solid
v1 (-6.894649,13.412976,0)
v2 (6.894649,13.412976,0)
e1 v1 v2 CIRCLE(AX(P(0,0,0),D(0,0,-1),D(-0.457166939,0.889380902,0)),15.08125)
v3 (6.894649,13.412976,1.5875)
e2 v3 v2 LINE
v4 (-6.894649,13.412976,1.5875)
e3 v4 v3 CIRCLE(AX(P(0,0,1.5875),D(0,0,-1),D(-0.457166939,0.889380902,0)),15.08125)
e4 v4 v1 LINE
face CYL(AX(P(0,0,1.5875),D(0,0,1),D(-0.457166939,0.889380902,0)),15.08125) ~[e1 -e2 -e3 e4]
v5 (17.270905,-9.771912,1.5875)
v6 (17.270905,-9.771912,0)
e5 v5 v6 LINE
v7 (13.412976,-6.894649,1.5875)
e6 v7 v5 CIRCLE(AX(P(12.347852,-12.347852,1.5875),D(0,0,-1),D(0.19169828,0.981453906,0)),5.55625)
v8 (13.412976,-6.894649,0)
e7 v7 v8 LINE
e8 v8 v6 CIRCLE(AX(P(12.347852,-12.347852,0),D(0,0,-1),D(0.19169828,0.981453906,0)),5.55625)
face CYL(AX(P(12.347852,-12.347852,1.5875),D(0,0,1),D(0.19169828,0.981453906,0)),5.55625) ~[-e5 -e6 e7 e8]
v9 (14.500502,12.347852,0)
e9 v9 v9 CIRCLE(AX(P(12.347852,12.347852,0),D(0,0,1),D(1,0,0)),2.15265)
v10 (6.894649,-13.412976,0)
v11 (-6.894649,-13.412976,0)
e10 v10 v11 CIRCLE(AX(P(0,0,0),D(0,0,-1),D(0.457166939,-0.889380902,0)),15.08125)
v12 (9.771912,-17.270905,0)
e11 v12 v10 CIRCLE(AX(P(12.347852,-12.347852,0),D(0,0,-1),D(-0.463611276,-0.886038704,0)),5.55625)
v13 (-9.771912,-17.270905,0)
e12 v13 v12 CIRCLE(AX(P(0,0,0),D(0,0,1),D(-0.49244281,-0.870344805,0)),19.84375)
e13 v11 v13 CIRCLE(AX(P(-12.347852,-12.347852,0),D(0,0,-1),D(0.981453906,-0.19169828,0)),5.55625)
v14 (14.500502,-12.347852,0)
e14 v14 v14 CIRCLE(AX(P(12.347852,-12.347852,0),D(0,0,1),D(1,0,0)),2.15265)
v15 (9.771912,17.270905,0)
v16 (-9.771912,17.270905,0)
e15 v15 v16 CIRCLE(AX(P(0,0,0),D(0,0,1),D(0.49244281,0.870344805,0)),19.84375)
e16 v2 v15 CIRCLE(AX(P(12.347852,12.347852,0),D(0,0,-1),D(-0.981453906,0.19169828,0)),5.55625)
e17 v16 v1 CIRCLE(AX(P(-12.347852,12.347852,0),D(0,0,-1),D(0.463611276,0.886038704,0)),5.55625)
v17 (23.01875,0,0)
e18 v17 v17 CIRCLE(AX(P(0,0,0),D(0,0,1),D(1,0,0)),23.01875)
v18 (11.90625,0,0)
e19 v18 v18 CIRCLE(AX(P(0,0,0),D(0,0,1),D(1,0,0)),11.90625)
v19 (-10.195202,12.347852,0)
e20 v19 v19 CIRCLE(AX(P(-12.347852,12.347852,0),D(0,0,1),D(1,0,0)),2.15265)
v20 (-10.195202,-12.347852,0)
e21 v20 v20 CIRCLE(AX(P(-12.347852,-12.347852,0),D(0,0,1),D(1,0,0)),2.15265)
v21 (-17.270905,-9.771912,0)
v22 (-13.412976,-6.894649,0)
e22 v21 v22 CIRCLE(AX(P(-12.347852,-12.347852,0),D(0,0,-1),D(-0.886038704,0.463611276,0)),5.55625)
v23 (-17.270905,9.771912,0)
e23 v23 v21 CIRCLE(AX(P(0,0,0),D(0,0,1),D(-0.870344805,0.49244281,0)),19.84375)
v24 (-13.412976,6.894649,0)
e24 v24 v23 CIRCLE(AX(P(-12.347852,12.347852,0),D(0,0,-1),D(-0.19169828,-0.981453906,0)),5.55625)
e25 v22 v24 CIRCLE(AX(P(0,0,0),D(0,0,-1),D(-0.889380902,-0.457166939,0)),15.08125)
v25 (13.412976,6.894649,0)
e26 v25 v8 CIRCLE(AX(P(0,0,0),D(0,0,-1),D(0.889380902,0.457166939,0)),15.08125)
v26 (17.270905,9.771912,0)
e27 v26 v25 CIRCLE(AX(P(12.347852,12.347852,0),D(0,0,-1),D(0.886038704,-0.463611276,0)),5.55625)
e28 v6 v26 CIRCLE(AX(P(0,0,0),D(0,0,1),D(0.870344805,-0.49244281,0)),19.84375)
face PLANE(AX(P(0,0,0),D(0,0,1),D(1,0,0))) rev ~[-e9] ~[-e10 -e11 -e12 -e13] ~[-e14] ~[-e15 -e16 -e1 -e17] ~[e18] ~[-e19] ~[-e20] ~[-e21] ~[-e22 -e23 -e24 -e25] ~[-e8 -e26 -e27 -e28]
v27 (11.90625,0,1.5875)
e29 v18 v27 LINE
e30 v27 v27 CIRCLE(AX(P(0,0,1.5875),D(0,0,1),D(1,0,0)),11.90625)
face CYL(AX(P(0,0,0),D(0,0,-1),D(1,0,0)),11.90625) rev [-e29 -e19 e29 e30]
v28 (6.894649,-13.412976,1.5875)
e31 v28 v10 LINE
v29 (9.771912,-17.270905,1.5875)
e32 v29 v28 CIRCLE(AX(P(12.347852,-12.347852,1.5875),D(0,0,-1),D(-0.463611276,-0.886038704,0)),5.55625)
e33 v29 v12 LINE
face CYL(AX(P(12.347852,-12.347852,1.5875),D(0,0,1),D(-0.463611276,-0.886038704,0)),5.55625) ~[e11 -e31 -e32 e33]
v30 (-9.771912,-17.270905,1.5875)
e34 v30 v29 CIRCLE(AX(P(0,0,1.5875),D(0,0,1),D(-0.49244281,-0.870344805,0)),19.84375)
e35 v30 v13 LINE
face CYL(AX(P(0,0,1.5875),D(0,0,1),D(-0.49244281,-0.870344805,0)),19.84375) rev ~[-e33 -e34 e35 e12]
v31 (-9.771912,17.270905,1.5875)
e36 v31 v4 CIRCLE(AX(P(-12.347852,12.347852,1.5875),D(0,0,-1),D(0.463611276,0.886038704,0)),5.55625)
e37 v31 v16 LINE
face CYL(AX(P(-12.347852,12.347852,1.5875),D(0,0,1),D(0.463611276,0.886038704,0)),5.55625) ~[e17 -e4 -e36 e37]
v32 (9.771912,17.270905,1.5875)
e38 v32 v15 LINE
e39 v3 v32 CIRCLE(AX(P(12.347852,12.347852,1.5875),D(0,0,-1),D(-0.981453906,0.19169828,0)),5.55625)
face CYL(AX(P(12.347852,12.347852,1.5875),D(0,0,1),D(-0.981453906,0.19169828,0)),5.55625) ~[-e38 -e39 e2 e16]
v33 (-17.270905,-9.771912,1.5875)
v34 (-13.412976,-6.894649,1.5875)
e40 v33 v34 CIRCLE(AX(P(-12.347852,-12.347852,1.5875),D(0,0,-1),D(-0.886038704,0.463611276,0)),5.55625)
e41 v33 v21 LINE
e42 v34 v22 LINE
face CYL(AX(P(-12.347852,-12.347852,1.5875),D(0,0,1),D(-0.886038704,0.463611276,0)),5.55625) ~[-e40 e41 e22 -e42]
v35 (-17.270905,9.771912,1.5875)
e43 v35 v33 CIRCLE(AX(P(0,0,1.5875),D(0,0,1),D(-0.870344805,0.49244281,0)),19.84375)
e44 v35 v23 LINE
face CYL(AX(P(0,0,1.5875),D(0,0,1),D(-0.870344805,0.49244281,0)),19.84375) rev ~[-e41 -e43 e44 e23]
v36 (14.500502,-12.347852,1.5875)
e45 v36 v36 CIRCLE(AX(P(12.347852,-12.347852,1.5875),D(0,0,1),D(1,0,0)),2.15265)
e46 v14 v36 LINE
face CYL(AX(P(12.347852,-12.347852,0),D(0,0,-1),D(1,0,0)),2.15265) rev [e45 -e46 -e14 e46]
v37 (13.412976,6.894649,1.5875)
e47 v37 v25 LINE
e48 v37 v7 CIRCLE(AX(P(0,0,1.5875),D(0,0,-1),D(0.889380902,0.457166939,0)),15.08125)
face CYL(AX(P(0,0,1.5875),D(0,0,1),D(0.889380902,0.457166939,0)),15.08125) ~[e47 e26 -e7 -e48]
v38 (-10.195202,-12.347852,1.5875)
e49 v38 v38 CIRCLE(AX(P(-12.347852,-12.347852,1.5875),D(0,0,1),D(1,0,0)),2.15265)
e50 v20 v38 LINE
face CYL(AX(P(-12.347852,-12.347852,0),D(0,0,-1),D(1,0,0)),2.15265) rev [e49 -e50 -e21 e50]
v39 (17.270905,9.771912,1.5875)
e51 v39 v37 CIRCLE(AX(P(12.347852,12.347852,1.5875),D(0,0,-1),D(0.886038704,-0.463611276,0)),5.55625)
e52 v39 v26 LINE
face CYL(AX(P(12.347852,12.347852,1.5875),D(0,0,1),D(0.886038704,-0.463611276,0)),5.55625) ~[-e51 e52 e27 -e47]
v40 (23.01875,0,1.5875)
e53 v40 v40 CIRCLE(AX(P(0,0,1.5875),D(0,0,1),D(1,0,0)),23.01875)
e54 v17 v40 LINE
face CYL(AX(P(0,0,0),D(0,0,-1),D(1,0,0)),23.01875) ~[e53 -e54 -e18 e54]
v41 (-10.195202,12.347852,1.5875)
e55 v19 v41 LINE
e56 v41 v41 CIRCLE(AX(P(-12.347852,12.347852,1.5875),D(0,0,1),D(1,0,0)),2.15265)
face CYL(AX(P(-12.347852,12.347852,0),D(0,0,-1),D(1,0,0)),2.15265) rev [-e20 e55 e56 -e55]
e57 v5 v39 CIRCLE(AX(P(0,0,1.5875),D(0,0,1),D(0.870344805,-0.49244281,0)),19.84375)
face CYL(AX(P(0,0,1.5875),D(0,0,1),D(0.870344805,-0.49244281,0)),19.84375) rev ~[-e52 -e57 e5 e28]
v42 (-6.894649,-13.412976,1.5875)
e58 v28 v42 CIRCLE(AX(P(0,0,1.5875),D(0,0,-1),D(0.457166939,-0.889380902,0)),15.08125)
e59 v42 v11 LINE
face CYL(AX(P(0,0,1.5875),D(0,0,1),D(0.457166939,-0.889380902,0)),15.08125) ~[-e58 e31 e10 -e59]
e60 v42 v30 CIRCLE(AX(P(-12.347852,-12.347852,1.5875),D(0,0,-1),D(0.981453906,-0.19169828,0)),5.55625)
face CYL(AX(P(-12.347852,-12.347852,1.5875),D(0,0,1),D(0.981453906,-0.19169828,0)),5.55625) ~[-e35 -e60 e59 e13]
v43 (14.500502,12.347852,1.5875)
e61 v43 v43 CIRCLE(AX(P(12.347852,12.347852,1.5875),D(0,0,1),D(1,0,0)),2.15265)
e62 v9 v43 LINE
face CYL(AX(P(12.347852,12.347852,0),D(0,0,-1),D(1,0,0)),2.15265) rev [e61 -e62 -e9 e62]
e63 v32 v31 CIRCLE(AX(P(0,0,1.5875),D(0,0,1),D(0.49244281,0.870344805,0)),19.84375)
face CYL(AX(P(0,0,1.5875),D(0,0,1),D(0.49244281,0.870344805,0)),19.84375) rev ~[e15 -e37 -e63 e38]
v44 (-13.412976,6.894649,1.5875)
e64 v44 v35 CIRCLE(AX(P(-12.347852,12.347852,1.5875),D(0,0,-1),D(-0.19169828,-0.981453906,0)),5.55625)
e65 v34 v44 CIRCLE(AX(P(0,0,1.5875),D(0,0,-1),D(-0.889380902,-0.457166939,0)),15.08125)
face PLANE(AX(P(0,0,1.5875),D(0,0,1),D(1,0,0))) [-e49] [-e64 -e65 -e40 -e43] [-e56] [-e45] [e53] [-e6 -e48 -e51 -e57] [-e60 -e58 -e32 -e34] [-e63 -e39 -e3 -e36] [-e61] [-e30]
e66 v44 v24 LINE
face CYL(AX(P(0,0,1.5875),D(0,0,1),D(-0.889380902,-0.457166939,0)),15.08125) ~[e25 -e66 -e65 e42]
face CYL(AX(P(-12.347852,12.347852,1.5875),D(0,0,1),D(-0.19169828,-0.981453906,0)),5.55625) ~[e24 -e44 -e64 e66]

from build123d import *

# Parameters (mm, degrees)
F0_R            = 23.01875
F0_R_2          = 2.15265
F0_R_3          = 11.90625
F1_DEPTH        = 1.5875
F3_DEPTH        = 1.5875
F3_COPIES_COUNT = 4


# Not quite as in the source:
# - a pattern or mirror of a feature is missing from the dataset's text; its kind, count and spacing are read off the source's solid


with BuildPart() as f1:
    # F0 (on Top) → F1 (new body)
    with BuildSketch(Plane.XY):
        Circle(F0_R)
        with Locations((-12.3478521665, -12.3478521665)):
            Circle(F0_R_2, mode=Mode.SUBTRACT)
        with Locations((12.3478521665, -12.3478521665)):
            Circle(F0_R_2, mode=Mode.SUBTRACT)
        with Locations((-12.3478521665, 12.3478521665)):
            Circle(F0_R_2, mode=Mode.SUBTRACT)
        Circle(F0_R_3, mode=Mode.SUBTRACT)
        with Locations((12.3478521665, 12.3478521665)):
            Circle(F0_R_2, mode=Mode.SUBTRACT)
    extrude(amount=F1_DEPTH)

    # F2 (on face) → F3 (cut, through all)
    with BuildSketch(Plane.XY.offset(1.5875)):
        with BuildLine():
            ThreePointArc((-9.7719120136, 17.2709047146), (-7.8938999882, 15.6696324205), (-6.8946489019, 13.4129757356))
            ThreePointArc((-6.8946489019, 13.4129757356), (0, 15.08125), (6.8946489019, 13.4129757356))
            ThreePointArc((6.8946489019, 13.4129757356), (7.8938999882, 15.6696324205), (9.7719120136, 17.2709047146))
            ThreePointArc((9.7719120136, 17.2709047146), (0, 19.84375), (-9.7719120136, 17.2709047146))
        make_face()
    f3 = extrude(amount=-F3_DEPTH, mode=Mode.SUBTRACT)

    # F3_copies: F3 ×4 about axis
    f3_copies_axis = Axis((0, 0, 0), (0, 0, 1))
    for i in range(1, F3_COPIES_COUNT):
        add(f3.rotate(f3_copies_axis, i * 360 / F3_COPIES_COUNT), mode=Mode.SUBTRACT)


solid = f1.part
